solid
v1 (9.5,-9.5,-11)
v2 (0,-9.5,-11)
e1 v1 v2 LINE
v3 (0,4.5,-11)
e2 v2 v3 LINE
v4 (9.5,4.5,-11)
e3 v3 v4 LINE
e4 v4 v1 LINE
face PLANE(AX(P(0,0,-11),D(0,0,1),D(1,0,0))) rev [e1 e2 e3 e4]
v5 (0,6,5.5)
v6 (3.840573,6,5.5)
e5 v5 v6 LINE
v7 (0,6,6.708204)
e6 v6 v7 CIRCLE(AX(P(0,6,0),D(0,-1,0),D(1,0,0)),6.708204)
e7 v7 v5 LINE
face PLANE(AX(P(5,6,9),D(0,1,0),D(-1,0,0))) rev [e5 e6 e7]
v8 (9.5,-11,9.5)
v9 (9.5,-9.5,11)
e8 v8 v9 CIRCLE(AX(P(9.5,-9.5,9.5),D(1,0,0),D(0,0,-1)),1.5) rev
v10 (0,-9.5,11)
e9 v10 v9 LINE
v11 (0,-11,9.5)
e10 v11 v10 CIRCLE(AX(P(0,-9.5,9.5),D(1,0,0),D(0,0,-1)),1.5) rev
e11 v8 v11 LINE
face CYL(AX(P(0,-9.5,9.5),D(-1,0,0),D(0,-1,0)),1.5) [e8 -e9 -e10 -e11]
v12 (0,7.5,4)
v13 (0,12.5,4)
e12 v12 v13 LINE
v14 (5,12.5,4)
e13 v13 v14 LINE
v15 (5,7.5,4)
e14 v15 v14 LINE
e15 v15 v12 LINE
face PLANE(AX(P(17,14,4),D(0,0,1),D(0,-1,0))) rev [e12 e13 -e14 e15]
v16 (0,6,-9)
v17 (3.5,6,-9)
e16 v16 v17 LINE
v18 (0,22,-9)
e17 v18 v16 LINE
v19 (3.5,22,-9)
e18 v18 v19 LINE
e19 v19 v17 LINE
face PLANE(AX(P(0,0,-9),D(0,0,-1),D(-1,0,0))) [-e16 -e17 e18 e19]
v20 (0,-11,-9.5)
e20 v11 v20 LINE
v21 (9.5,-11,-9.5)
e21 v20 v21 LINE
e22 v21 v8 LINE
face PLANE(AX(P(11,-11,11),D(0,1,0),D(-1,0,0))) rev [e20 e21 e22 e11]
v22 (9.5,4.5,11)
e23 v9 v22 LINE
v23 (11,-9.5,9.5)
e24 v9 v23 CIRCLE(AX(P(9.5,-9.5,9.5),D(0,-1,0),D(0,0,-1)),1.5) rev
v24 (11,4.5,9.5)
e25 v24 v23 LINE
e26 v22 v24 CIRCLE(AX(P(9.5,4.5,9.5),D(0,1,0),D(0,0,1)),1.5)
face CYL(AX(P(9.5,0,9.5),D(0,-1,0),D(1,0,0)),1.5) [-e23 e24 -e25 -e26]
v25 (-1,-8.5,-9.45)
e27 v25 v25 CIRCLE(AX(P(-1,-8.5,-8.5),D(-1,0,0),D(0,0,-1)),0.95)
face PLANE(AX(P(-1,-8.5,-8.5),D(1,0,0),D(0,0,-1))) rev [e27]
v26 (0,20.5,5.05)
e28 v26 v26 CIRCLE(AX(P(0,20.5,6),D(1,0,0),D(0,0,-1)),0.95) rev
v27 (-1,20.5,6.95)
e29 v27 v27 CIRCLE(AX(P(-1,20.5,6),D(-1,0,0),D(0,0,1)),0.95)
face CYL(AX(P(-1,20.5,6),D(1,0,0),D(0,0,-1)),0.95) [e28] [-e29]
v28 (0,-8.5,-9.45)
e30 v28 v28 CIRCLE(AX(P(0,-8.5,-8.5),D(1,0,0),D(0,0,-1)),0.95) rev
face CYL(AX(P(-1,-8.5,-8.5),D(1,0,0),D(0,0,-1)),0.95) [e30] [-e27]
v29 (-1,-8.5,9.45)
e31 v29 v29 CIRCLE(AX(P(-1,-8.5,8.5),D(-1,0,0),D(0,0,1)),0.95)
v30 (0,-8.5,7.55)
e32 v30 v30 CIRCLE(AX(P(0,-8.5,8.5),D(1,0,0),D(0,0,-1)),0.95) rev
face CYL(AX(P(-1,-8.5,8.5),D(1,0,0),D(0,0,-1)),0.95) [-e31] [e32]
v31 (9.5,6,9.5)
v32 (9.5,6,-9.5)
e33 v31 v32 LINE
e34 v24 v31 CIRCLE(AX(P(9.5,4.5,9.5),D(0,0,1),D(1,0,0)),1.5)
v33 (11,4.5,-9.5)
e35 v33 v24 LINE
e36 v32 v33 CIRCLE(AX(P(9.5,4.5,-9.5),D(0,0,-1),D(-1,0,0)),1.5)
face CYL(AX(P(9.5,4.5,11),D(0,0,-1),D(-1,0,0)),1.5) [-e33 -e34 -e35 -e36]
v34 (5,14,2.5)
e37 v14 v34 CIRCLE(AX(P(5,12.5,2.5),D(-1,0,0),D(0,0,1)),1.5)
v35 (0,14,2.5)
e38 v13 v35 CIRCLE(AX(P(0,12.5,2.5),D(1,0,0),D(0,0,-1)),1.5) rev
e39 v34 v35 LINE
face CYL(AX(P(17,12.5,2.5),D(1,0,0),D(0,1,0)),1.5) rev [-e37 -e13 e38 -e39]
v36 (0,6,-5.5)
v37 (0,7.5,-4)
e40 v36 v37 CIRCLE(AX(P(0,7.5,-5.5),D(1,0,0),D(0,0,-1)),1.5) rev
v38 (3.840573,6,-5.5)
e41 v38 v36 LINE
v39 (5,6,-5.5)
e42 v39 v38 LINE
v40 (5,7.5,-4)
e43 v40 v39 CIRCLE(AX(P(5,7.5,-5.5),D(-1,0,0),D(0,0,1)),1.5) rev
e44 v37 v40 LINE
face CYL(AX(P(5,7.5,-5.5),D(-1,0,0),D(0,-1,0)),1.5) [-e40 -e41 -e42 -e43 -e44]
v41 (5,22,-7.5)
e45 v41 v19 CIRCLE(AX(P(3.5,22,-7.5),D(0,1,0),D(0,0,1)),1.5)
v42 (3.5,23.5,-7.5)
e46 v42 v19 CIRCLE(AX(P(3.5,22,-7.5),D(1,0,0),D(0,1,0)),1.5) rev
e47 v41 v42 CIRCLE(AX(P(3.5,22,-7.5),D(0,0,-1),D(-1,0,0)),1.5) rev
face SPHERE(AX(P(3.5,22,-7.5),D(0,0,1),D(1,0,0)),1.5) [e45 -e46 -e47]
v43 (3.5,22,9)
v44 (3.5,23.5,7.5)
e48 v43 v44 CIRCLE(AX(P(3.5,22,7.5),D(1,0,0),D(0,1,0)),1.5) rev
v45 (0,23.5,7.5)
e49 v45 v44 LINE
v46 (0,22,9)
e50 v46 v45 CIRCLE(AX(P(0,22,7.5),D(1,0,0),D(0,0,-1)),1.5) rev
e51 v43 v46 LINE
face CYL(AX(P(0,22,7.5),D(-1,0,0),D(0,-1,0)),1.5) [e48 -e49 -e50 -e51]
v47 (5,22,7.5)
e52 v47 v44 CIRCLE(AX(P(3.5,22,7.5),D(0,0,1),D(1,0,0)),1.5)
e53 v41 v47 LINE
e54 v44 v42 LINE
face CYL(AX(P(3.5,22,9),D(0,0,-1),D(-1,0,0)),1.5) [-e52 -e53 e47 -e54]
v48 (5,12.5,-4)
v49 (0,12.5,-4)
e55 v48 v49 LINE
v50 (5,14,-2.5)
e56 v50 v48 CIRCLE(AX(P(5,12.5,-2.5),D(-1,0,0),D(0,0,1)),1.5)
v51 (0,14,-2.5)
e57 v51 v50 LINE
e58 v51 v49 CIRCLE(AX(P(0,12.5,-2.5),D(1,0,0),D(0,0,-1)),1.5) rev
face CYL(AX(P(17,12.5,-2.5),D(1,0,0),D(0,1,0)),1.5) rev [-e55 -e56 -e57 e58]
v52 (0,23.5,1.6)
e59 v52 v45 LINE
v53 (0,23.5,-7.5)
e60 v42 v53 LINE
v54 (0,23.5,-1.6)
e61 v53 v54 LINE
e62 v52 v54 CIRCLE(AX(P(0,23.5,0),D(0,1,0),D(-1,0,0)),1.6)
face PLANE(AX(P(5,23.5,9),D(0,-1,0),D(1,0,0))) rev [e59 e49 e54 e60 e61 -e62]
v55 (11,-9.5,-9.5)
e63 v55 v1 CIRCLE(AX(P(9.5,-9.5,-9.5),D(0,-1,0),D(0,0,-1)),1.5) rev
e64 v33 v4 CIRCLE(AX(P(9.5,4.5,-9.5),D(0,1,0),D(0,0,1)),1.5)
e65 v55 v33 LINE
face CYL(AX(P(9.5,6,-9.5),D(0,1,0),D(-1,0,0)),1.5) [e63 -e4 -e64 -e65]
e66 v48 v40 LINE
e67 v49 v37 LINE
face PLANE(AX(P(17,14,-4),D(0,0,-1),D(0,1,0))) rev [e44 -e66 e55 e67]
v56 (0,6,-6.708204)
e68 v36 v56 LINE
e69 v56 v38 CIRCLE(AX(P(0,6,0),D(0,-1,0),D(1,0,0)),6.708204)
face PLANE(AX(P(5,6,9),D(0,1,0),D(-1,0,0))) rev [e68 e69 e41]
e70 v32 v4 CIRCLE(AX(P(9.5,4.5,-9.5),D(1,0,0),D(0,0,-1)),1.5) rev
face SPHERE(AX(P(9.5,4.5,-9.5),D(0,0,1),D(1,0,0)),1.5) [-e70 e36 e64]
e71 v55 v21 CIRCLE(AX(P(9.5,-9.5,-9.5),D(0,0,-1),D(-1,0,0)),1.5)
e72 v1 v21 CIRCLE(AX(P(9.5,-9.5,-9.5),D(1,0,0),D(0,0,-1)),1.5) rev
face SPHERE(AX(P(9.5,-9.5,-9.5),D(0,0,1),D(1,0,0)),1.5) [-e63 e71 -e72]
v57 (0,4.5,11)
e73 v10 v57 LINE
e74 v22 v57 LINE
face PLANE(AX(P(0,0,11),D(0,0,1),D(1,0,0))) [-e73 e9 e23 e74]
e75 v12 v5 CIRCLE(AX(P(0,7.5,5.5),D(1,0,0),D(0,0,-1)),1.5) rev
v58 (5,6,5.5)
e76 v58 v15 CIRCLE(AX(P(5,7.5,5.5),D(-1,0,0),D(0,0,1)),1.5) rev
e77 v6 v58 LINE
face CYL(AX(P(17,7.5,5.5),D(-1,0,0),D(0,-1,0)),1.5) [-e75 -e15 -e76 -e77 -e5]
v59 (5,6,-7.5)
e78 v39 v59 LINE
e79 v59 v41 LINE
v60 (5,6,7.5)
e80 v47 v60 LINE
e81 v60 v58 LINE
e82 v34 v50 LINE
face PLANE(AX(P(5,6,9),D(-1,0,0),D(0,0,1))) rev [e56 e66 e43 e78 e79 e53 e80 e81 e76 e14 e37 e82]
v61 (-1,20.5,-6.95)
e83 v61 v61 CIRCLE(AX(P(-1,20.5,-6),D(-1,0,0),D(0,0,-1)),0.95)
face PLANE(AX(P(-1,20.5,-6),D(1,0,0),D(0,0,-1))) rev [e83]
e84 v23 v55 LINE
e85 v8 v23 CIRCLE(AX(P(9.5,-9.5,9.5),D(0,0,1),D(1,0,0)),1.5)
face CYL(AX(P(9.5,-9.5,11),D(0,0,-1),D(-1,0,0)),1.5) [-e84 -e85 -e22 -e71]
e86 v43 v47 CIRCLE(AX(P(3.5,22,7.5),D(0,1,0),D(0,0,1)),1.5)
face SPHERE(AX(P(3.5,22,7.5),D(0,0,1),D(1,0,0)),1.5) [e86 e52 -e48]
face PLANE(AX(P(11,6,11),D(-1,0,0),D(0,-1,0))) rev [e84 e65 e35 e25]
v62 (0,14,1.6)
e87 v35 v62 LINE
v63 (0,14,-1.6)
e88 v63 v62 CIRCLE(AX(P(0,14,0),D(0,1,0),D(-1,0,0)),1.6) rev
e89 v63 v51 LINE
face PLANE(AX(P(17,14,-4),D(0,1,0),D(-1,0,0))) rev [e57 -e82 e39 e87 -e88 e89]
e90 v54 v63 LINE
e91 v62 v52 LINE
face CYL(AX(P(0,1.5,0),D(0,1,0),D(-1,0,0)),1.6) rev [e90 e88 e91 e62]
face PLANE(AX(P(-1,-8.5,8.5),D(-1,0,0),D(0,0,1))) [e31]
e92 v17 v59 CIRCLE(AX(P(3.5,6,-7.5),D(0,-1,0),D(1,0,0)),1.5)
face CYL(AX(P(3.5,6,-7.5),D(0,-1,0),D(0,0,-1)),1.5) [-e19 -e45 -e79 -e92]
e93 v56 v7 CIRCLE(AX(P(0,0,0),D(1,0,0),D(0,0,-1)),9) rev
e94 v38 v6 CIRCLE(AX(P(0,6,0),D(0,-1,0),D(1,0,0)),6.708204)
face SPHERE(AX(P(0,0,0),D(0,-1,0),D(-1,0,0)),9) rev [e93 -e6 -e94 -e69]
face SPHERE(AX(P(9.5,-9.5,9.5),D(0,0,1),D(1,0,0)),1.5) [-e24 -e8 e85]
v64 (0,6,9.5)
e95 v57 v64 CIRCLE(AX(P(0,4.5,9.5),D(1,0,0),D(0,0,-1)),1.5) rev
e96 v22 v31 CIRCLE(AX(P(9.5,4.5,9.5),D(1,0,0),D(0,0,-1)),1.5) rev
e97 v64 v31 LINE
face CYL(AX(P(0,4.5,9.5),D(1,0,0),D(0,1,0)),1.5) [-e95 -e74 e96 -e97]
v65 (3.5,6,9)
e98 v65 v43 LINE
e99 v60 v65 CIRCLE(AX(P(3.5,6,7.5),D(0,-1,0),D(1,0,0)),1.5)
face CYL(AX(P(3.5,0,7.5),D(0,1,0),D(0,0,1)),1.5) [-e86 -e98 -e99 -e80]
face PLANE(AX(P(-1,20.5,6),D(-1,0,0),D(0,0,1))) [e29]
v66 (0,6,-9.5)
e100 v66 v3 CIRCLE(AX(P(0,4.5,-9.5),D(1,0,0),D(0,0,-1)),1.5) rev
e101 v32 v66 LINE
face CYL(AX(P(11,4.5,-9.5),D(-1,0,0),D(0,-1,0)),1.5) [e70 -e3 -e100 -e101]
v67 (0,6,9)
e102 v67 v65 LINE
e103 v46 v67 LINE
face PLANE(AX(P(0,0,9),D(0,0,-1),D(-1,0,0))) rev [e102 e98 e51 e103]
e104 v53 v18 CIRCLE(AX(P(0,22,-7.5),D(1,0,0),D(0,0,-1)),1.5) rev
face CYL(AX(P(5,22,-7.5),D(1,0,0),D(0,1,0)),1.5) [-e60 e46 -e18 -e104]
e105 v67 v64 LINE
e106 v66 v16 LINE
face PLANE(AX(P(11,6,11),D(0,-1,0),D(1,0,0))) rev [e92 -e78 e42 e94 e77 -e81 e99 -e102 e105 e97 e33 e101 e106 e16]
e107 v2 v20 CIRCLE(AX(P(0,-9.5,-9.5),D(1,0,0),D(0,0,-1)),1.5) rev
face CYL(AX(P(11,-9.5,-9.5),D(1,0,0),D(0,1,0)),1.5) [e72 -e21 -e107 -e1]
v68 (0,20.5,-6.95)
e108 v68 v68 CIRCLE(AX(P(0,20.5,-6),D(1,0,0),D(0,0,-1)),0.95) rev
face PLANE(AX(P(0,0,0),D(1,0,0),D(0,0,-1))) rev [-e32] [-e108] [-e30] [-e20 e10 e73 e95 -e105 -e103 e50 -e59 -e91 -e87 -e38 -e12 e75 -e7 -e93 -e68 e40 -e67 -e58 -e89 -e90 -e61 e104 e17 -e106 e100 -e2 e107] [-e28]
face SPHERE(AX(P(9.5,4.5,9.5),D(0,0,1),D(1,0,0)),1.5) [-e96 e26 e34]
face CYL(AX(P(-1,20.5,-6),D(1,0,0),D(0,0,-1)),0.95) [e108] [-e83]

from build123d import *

# Parameters (mm, degrees)
SKETCH_1_W          = 22
SKETCH_1_H          = 17
EXTRUDE_1_DEPTH     = 11
SKETCH_3_W          = 10
SKETCH_3_H          = 17.5
EXTRUDE_2_DEPTH     = 9
SKETCH_4_R          = 1.6
CUT_EXTRUDE_1_DEPTH = 22
SKETCH_5_W          = 8
SKETCH_5_H          = 8
CUT_EXTRUDE_2_DEPTH = 22
FILLET_1_R          = 1.5
FILLET_START        = -6
FILLET_2_DEPTH      = 11
FILLET_START_2      = -5
FILLET_2_2_DEPTH    = 10
SKETCH_7_W          = 37.569031752
SKETCH_7_H          = 53.082934042
CUT_EXTRUDE_4_DEPTH = 22
SKETCH_8_R          = 0.95
EXTRUDE_3_DEPTH     = 1


with BuildPart() as part:
    # 草图1 → 凸台-拉伸1 (new, symmetric)
    with BuildSketch(Plane.XY):
        with Locations((0, -2.5)):
            Rectangle(SKETCH_1_W, SKETCH_1_H)
    extrude(amount=EXTRUDE_1_DEPTH, both=True)

    # 草图2 → 切除-旋转1 (revolve, cut)
    with BuildSketch(Plane.XY, mode=Mode.PRIVATE) as cut_revolve_1_sk:
        with BuildLine():
            Line((0, 6), (6.708203932, 6))
            ThreePointArc((6.708203932, 6), (8.215838363, -3.674234614), (0, -9))
            Line((0, -9), (0, 6))
        make_face()
    revolve(cut_revolve_1_sk.sketch.rotate(Axis((0, 0, 0), (0, 1, 0)), 180), axis=Axis((0, 0, 0), (0, 1, 0)), mode=Mode.SUBTRACT)

    # 草图3 → 凸台-拉伸2 (add, symmetric)
    with BuildSketch(Plane.XY):
        with Locations((0, 14.75)):
            Rectangle(SKETCH_3_W, SKETCH_3_H)
    extrude(amount=EXTRUDE_2_DEPTH, both=True)

    # 草图4 → 切除-拉伸1 (cut)
    with BuildSketch(Plane(origin=(0, 23.5, 0), x_dir=(1, 0, 0), z_dir=(0, 1, 0))):
        with Locations(Location((0, 0, 0), (0, 0, 180))):
            Circle(SKETCH_4_R)
    extrude(amount=-CUT_EXTRUDE_1_DEPTH, mode=Mode.SUBTRACT)

    # 草图5 → 切除-拉伸2 (cut)
    with BuildSketch(Plane.ZY.offset(5)):
        with Locations((0, 10)):
            Rectangle(SKETCH_5_W, SKETCH_5_H)
    extrude(amount=-CUT_EXTRUDE_2_DEPTH, mode=Mode.SUBTRACT)

    # 圆角1
    fillet_1_edges = [part.edges().sort_by_distance(p)[0] for p in [
        (0, -11, 11),
        (11, -2.5, 11),
        (5, 14.75, -9),
        (0, 23.5, -9),
        (5, 23.5, 0),
        (-5, 14.75, -9),
        (-5, 23.5, 0),
        (5, 14.75, 9),
        (0, 23.5, 9),
        (-5, 14.75, 9),
        (0, 6, 11),
        (11, -2.5, -11),
        (0, -11, -11),
        (-11, -2.5, -11),
        (0, 6, -11),
        (11, 6, 0),
        (11, -11, 0),
        (-11, -11, 0),
        (-11, 6, 0),
        (-11, -2.5, 11),
    ]]
    fillet(fillet_1_edges, radius=FILLET_1_R)

    # 圆角2: read off the stored shape, not the designer's step
    # 圆角2 outline → 圆角2 (cut)
    with BuildSketch(Plane.YZ.offset(FILLET_START)):
        with BuildLine():
            Line((6, -4), (6, -5.5))
            ThreePointArc((6, -5.5), (6.439339828, -4.439339828), (7.5, -4))
            Line((7.5, -4), (6, -4))
        make_face()
        with BuildLine():
            Line((6, 4), (7.5, 4))
            ThreePointArc((7.5, 4), (6.439339828, 4.439339828), (6, 5.5))
            Line((6, 5.5), (6, 4))
        make_face()
    extrude(amount=FILLET_2_DEPTH, mode=Mode.SUBTRACT)

    # Fillet 2 2 outline → Fillet 2 2 (add)
    with BuildSketch(Plane.YZ.offset(FILLET_START_2)):
        with BuildLine():
            ThreePointArc((12.5, 4), (13.560660172, 3.560660172), (14, 2.5))
            Line((14, 2.5), (14, 4))
            Line((14, 4), (12.5, 4))
        make_face()
        with BuildLine():
            ThreePointArc((14, -2.5), (13.560660172, -3.560660172), (12.5, -4))
            Line((12.5, -4), (14, -4))
            Line((14, -4), (14, -2.5))
        make_face()
    extrude(amount=FILLET_2_2_DEPTH)

    # 草图7 → 切除-拉伸4 (cut)
    with BuildSketch(Plane(origin=(0, 0, 0), x_dir=(0, 0, -1), z_dir=(1, 0, 0))):
        Rectangle(SKETCH_7_W, SKETCH_7_H)
    extrude(amount=-CUT_EXTRUDE_4_DEPTH, mode=Mode.SUBTRACT)

    # 草图8 → 凸台-拉伸3 (add)
    with BuildSketch(Plane.ZY):
        with Locations(Location((6, 20.5, 0), (0, 0, 180))):
            Circle(SKETCH_8_R)
        with Locations(Location((8.5, -8.5, 0), (0, 0, 180))):
            Circle(SKETCH_8_R)
        with Locations(Location((-6, 20.5, 0), (0, 0, 180))):
            Circle(SKETCH_8_R)
        with Locations(Location((-8.5, -8.5, 0), (0, 0, 180))):
            Circle(SKETCH_8_R)
    extrude(amount=EXTRUDE_3_DEPTH)


solid = part.part
